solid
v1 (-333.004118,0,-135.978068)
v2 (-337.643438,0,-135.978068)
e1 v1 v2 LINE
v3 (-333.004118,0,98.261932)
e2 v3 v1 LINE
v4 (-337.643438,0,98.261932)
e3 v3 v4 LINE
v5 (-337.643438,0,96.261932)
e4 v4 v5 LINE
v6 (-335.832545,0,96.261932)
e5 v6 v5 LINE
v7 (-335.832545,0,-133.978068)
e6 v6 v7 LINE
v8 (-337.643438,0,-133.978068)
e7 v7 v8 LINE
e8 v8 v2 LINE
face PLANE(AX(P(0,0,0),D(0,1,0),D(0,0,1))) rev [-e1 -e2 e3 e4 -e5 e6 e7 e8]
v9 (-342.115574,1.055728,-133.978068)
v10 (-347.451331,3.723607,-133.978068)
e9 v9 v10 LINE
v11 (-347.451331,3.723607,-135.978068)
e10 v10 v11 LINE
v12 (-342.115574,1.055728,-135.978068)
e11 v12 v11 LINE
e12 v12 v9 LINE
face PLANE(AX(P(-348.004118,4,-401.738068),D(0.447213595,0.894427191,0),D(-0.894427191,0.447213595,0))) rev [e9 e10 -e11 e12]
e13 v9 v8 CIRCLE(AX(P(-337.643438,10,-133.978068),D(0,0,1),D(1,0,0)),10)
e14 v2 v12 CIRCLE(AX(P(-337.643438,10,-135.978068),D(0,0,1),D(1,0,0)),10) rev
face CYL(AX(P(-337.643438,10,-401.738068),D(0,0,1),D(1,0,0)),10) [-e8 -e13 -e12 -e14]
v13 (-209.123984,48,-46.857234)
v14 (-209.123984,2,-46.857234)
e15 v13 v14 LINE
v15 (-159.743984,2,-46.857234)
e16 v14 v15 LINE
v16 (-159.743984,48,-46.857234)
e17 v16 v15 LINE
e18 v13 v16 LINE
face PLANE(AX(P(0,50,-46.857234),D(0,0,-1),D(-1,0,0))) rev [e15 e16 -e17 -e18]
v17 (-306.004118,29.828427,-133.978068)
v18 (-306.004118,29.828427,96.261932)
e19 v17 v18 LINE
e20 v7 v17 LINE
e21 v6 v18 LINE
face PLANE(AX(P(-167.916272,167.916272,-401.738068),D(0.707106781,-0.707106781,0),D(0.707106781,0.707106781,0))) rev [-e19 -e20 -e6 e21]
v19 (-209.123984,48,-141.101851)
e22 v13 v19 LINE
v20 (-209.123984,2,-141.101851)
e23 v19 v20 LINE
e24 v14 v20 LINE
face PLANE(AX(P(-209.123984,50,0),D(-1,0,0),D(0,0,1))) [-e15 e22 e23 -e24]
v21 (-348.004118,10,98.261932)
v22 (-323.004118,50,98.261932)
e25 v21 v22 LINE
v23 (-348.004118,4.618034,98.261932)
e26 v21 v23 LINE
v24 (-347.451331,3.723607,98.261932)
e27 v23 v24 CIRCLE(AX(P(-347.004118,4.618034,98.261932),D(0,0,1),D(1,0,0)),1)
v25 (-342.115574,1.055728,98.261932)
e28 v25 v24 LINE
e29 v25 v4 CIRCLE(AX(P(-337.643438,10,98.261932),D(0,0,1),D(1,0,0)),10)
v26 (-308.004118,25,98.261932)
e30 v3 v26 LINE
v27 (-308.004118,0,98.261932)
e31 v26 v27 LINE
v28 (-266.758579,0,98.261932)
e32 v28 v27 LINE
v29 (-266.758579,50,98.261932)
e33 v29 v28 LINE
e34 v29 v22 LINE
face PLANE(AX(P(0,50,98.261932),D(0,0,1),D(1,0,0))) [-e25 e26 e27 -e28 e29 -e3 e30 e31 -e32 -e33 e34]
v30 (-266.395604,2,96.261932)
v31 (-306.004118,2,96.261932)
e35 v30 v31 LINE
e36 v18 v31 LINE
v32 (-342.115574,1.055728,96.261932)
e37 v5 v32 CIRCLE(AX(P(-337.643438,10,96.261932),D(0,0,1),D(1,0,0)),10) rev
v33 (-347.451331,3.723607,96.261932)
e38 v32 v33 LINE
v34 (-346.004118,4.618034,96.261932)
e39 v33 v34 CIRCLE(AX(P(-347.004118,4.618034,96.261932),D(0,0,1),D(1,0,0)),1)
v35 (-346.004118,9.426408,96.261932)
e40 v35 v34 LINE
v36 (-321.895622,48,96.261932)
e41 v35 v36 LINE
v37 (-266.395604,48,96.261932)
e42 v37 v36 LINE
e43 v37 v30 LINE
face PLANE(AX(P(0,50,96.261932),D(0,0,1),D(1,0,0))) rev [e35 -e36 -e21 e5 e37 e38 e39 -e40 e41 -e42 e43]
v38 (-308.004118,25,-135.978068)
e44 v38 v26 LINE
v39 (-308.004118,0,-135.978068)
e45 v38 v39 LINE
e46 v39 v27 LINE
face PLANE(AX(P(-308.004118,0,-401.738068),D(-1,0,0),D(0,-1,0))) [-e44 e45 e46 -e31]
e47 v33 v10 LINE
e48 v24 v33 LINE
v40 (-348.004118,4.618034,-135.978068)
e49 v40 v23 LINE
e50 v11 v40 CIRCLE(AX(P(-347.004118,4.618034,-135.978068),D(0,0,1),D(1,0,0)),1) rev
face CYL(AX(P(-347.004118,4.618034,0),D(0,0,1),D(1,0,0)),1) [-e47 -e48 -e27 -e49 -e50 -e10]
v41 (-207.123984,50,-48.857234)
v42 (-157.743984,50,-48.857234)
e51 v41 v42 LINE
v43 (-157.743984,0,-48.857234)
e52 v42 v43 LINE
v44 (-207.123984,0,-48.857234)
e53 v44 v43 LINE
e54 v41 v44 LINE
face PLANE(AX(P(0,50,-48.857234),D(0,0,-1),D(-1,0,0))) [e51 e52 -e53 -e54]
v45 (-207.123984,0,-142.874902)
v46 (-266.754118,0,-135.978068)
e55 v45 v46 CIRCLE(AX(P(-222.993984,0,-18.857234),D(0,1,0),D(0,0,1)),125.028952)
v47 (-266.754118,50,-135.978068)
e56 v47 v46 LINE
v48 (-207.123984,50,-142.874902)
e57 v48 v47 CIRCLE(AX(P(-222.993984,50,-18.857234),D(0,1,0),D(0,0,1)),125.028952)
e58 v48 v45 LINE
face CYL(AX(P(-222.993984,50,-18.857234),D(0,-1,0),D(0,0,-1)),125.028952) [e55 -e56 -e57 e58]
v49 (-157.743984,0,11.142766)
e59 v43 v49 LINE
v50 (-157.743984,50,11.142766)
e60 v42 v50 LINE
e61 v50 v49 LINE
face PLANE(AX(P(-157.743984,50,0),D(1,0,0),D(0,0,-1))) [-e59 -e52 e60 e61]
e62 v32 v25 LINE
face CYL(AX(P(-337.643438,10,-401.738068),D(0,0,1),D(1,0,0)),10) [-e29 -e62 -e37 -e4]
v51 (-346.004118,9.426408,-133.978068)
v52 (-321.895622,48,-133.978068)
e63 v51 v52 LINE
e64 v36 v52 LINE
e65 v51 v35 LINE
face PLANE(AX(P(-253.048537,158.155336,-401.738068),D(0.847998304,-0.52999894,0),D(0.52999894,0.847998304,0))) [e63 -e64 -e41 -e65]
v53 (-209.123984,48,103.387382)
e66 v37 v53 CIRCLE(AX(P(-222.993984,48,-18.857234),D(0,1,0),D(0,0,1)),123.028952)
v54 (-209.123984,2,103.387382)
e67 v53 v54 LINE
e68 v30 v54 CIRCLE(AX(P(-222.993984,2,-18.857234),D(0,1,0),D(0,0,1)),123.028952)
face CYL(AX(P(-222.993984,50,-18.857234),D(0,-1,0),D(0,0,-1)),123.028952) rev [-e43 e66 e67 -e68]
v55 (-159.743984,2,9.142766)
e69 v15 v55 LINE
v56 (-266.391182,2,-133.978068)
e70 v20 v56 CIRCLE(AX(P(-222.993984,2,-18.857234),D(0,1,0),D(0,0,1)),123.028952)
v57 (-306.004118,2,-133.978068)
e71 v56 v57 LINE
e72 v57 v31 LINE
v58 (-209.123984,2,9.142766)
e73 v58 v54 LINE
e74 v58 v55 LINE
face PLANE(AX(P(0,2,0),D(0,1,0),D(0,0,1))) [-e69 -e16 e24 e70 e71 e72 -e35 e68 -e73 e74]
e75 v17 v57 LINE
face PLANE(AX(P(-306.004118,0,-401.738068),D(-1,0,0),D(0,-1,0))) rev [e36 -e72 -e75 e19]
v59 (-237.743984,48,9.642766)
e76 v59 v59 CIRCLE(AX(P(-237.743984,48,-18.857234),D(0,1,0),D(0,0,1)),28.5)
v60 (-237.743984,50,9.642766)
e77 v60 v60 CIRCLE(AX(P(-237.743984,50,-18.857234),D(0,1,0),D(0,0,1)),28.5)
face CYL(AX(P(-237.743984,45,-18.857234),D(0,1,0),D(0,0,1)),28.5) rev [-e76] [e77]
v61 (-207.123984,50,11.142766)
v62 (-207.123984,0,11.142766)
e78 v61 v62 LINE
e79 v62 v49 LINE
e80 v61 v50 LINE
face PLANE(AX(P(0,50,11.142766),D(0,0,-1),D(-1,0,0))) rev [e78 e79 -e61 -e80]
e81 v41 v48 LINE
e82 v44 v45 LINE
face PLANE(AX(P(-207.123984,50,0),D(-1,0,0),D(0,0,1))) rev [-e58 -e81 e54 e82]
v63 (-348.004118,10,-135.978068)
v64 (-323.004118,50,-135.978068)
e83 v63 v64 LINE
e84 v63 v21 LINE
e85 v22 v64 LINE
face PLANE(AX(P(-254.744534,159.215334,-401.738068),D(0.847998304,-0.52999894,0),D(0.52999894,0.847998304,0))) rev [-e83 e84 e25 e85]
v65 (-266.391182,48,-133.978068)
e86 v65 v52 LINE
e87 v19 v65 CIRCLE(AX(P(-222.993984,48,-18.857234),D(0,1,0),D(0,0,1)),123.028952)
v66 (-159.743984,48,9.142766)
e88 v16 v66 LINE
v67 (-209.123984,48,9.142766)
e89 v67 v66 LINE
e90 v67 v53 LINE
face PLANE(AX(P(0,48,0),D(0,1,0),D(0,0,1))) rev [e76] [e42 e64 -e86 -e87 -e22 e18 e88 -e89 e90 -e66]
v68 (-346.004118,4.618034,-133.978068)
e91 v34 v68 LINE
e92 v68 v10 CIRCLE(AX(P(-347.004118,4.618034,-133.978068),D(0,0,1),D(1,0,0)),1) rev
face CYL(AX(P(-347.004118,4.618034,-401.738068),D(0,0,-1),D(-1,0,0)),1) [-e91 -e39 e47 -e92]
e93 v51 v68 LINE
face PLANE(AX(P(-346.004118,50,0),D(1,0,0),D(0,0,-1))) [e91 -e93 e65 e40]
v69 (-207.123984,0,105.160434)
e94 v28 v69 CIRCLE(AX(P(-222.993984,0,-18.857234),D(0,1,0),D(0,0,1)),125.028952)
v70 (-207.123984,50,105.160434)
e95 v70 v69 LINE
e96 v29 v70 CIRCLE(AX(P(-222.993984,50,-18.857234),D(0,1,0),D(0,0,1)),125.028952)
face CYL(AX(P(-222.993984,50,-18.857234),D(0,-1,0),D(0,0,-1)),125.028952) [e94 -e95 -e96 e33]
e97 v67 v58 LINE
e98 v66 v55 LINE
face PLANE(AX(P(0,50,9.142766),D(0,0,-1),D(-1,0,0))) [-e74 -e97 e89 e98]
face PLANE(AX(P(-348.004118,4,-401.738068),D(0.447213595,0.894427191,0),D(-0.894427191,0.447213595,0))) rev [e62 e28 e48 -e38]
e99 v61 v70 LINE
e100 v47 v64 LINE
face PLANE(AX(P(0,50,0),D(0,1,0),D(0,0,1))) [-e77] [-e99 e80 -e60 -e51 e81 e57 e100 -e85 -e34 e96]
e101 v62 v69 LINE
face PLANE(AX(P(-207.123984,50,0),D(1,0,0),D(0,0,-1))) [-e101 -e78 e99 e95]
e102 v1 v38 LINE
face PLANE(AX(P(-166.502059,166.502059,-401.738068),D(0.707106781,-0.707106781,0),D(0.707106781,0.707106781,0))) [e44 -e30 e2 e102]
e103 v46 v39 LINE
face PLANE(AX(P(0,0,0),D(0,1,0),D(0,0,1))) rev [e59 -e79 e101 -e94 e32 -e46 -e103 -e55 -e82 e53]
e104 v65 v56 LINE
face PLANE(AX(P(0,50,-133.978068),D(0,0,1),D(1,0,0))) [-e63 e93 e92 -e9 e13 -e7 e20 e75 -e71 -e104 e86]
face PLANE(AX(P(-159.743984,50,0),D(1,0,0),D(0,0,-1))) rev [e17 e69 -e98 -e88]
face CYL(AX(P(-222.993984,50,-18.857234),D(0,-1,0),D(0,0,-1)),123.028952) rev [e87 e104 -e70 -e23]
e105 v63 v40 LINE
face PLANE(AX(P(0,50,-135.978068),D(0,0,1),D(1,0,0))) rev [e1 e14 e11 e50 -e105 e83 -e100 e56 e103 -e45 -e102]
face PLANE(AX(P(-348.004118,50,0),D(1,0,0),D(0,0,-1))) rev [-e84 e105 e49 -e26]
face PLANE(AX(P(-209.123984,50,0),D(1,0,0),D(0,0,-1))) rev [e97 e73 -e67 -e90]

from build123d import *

# Parameters (mm, degrees)
SKETCH1_W           = 109
SKETCH1_H           = 60
BOSS_EXTRUDE1_DEPTH = 50
CUT_EXTRUDE1_DEPTH  = 500
SHELL2_T            = -2
CUT_EXTRUDE2_DEPTH  = 500
FILLET1_R           = 1
FILLET2_R           = 10
SKETCH4_R           = 28.5
CUT_EXTRUDE3_DEPTH  = 5


with BuildPart() as part:
    # Sketch1 → Boss-Extrude1 (new body)
    with BuildSketch(Plane(origin=(0, 0, 0), x_dir=(1, 0, 0), z_dir=(0, 1, 0))):
        with BuildLine():
            ThreePointArc((-348.004117683, 21.026446367), (-325.093541396, 91.023149879), (-266.754117683, 135.978067844))
            Line((-266.754117683, 135.978067844), (-348.004117683, 135.978067844))
            Line((-348.004117683, 135.978067844), (-348.004117683, 21.026446367))
        make_face()
        with BuildLine():
            Line((-266.754117683, -98.261932156), (-266.754117683, 135.978067844))
            ThreePointArc((-266.754117683, 135.978067844), (-325.093541396, 91.023149879), (-348.004117683, 21.026446367))
            Line((-348.004117683, 21.026446367), (-348.004117683, 16.688022305))
            ThreePointArc((-348.004117683, 16.688022305), (-325.094915866, -53.306736582), (-266.758579073, -98.261932156))
            Line((-266.758579073, -98.261932156), (-266.754117683, -98.261932156))
        make_face()
        with BuildLine():
            Line((-348.004117683, -98.261932156), (-266.758579073, -98.261932156))
            ThreePointArc((-266.758579073, -98.261932156), (-325.094915866, -53.306736582), (-348.004117683, 16.688022305))
            Line((-348.004117683, 16.688022305), (-348.004117683, -98.261932156))
        make_face()
        with BuildLine():
            Line((-266.743984385, 48.857234336), (-207.123984385, 48.857234336))
            Line((-207.123984385, 48.857234336), (-207.123984385, 142.874902464))
            ThreePointArc((-207.123984385, 142.874902464), (-237.359097186, 143.058210347), (-266.754117683, 135.978067844))
            Line((-266.754117683, 135.978067844), (-266.754117683, -98.261932156))
            Line((-266.754117683, -98.261932156), (-266.758579073, -98.261932156))
            ThreePointArc((-266.758579073, -98.261932156), (-237.361462745, -105.343468051), (-207.123984385, -105.160433792))
            Line((-207.123984385, -105.160433792), (-207.123984385, -11.142765664))
            Line((-207.123984385, -11.142765664), (-266.743984385, -11.142765664))
            Line((-266.743984385, -11.142765664), (-266.743984385, 48.857234336))
        make_face()
        with Locations((-212.243984385, 18.857234336)):
            Rectangle(SKETCH1_W, SKETCH1_H)
    extrude(amount=BOSS_EXTRUDE1_DEPTH)

    # Sketch2 → Cut-Extrude1 (cut)
    with BuildSketch(Plane.XY.offset(98.261932156)):
        Polygon((-348.004117683, 50), (-348.004117683, 10), (-323.004117683, 50), align=None)
        Polygon((-308.004117683, 25), (-333.004117683, 0), (-308.004117683, 0), align=None)
    extrude(amount=-CUT_EXTRUDE1_DEPTH, mode=Mode.SUBTRACT)

    # Shell2
    shell2_openings = [part.faces().sort_by_distance(p)[0] for p in [
        (-340.504117683, 0, -18.858067844),
    ]]
    offset(amount=SHELL2_T, openings=shell2_openings, kind=Kind.INTERSECTION)

    # Sketch3 → Cut-Extrude2 (cut)
    with BuildSketch(Plane.XY.offset(98.261932156)):
        Polygon((-348.004117683, 0), (-348.004117683, 4), (-340.004117683, 0), align=None)
    extrude(amount=-CUT_EXTRUDE2_DEPTH, mode=Mode.SUBTRACT)

    # Fillet1
    fillet1_edges = [part.edges().sort_by_distance(p)[0] for p in [
        (-348.004117683, 4, -18.858067844),
        (-346.004117683, 3, -18.858067844),
    ]]
    fillet(fillet1_edges, radius=FILLET1_R - 0.0001)  # a hair under: the kernel refuses the full size

    # Fillet2
    fillet2_edges = [part.edges().sort_by_distance(p)[0] for p in [
        (-340.004117683, 0, -134.978067844),
        (-340.004117683, 0, 97.261932156),
    ]]
    fillet(fillet2_edges, radius=FILLET2_R)

    # Sketch4 → Cut-Extrude3 (cut)
    with BuildSketch(Plane(origin=(0, 50, 0), x_dir=(1, 0, 0), z_dir=(0, 1, 0))):
        with Locations(Location((-237.743984385, 18.857234336, 0), (0, 0, 270))):
            Circle(SKETCH4_R)
    extrude(amount=-CUT_EXTRUDE3_DEPTH, mode=Mode.SUBTRACT)


solid = part.part
